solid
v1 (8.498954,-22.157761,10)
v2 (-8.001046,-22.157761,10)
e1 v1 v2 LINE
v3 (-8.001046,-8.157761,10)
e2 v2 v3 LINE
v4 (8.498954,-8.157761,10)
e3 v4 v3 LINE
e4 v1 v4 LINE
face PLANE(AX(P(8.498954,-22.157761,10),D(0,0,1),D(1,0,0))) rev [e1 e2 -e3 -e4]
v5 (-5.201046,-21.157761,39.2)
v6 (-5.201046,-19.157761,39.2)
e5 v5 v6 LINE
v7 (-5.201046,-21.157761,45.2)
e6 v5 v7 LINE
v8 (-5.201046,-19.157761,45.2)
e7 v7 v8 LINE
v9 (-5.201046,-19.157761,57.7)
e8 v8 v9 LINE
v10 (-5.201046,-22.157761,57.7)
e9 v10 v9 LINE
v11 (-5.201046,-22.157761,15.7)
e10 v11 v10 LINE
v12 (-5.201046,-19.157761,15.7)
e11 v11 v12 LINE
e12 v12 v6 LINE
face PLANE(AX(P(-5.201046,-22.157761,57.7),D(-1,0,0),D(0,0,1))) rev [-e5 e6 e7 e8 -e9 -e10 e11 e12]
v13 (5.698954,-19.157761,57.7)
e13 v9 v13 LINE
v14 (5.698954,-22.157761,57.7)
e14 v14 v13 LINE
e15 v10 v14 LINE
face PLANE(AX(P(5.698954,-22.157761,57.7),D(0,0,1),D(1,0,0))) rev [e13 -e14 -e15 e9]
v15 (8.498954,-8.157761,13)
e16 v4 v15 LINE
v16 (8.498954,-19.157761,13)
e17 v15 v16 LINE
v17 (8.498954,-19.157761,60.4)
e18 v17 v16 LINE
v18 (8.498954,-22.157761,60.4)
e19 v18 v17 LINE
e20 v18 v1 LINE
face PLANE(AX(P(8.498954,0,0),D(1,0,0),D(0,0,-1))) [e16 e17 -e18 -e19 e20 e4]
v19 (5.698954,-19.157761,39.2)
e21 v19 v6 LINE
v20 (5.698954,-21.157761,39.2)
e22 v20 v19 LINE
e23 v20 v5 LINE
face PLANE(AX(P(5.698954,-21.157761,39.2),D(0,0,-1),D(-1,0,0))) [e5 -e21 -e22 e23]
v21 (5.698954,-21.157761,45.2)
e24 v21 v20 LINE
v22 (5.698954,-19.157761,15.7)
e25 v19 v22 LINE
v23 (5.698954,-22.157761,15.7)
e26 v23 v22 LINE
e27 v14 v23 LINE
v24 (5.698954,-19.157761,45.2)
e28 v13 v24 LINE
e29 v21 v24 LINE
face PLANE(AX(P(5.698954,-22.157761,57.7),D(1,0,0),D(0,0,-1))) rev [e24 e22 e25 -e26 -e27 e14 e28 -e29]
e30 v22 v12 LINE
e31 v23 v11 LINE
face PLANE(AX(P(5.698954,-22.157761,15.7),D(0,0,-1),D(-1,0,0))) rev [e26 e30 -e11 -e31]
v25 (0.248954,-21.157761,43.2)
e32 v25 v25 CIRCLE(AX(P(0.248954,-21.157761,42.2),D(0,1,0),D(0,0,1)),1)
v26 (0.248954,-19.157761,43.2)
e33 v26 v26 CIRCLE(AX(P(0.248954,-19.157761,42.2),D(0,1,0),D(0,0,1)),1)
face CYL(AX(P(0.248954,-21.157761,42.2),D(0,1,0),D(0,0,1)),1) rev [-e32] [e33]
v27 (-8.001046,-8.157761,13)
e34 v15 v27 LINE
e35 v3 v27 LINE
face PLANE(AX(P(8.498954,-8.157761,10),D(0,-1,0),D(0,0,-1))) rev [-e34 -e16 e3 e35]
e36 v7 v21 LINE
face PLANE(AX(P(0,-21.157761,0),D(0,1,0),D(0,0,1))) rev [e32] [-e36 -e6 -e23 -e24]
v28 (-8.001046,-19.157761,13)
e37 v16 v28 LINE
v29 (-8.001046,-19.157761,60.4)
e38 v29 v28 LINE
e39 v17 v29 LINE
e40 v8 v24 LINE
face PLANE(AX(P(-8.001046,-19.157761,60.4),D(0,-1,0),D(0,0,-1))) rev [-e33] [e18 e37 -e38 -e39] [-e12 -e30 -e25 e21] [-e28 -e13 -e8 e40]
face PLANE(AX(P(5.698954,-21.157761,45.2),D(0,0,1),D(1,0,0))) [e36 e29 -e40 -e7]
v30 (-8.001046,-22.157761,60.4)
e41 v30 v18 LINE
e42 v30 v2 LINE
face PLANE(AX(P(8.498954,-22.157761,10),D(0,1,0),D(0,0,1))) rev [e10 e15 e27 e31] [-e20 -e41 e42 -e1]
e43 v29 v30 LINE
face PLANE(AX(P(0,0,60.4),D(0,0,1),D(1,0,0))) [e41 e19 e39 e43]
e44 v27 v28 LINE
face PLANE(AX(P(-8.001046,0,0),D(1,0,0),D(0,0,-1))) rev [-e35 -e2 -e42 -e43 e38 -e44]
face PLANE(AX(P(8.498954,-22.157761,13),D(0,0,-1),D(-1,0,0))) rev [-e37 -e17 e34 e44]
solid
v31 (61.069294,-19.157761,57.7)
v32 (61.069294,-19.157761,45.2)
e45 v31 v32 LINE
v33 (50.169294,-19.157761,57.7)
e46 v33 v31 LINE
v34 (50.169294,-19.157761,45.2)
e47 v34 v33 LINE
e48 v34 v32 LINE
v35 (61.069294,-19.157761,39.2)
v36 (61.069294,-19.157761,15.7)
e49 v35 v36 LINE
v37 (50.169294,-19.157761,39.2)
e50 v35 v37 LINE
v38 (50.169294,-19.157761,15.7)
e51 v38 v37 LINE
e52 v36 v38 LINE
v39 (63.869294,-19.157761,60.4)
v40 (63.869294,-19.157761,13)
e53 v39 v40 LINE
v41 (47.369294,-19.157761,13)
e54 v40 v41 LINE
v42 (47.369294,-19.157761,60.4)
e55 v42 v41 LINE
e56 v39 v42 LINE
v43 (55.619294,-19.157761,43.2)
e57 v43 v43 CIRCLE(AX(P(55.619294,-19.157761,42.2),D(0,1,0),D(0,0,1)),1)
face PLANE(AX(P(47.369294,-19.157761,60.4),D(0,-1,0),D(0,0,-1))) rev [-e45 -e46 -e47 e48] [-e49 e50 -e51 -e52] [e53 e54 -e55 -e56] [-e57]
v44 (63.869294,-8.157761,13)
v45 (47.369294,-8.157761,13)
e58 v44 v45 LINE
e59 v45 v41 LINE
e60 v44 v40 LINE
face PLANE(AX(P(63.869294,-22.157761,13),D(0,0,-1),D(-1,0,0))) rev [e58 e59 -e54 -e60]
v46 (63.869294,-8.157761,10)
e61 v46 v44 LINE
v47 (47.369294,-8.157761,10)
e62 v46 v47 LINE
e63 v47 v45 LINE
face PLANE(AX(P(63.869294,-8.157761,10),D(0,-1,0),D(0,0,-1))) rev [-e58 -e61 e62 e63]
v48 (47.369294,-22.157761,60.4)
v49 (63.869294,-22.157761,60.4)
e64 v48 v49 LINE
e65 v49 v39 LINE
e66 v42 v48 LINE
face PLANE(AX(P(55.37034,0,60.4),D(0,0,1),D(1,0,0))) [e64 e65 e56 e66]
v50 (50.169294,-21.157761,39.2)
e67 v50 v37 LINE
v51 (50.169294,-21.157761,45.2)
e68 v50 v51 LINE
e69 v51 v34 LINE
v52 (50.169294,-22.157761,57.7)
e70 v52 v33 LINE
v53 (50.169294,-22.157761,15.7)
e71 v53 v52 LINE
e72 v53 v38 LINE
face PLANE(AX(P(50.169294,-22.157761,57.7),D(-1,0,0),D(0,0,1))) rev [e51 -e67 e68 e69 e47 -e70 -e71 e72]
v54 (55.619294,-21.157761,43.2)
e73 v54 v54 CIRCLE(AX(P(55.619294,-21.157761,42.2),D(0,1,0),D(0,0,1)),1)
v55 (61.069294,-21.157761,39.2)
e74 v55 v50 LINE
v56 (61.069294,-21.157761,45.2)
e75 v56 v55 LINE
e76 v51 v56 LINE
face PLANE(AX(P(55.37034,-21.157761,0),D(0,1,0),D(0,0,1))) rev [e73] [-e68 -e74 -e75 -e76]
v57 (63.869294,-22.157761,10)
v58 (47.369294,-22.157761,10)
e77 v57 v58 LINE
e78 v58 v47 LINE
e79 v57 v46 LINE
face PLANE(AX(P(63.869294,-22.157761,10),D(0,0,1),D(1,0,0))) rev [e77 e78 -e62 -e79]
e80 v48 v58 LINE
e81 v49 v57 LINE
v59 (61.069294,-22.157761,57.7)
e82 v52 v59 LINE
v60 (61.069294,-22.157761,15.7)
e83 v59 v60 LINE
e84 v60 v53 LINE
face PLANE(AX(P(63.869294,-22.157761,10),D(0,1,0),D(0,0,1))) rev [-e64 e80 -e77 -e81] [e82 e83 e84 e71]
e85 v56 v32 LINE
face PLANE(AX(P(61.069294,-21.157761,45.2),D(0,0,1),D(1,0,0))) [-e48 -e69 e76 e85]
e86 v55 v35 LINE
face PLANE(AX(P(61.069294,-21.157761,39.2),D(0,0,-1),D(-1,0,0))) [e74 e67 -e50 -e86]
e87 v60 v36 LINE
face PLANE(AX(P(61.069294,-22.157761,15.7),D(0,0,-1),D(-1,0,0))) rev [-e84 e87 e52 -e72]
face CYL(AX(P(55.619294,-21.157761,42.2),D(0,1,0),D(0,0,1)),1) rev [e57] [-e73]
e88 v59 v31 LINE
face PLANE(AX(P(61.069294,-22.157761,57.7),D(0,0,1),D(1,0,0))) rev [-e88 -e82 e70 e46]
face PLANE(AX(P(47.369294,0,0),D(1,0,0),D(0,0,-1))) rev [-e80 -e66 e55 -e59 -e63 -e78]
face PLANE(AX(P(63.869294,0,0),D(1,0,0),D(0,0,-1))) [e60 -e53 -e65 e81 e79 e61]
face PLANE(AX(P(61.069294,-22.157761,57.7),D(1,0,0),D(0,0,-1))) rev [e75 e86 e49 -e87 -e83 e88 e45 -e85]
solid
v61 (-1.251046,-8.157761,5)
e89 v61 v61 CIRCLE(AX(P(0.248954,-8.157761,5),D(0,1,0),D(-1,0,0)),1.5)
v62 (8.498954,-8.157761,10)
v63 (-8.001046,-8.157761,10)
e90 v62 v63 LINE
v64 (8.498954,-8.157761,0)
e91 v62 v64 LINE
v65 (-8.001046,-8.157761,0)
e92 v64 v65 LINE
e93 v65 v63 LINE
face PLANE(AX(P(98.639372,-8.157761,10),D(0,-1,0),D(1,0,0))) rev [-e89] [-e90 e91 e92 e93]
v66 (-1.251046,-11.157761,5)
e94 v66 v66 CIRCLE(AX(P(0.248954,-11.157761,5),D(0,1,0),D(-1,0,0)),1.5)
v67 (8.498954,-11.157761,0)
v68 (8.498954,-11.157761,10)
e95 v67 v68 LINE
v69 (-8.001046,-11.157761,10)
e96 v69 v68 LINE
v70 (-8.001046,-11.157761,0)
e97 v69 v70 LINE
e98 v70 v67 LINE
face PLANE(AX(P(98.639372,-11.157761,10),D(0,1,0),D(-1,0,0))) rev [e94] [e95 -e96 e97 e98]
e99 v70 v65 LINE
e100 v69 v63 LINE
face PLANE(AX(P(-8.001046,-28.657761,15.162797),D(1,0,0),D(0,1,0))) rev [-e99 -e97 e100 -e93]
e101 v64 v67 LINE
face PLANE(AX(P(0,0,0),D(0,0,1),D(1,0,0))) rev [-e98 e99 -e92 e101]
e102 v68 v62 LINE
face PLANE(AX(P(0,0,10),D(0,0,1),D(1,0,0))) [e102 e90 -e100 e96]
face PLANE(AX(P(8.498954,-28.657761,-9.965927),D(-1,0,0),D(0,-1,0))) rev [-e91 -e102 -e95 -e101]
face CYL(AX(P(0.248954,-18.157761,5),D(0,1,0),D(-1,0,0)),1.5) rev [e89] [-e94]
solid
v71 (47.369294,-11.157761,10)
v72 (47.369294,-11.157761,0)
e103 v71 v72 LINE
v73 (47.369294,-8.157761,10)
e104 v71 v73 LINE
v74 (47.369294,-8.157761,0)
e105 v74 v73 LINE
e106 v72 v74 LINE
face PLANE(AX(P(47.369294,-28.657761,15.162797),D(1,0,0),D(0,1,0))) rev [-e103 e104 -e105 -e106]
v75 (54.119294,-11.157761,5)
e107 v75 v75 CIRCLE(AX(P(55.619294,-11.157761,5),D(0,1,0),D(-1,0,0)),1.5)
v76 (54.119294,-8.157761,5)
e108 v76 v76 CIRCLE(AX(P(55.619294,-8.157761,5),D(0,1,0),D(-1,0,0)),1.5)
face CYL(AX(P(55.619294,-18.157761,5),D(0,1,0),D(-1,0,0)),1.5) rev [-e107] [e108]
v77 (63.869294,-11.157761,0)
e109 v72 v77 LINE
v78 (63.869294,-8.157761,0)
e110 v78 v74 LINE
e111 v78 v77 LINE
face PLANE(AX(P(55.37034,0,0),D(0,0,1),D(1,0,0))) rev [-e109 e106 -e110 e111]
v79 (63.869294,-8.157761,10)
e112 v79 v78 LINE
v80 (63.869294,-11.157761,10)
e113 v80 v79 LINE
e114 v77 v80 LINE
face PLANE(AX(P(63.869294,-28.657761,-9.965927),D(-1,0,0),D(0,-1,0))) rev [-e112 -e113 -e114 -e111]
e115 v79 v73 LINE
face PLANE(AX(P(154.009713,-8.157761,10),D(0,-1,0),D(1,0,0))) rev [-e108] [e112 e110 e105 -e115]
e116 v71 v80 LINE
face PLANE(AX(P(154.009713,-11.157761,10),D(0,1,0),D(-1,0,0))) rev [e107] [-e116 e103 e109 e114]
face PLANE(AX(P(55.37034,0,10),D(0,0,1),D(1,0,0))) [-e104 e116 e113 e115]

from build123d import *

# Parameters (mm, degrees)
SKETCH1_W                   = 170
SKETCH1_H                   = 3
BOSS_EXTRUDE1_DEPTH         = 10
SKETCH4_R                   = 1.2
CUT_EXTRUDE1_DEPTH          = 21
SKETCH2_W                   = 45.3
SKETCH2_H                   = 3
BOSS_EXTRUDE6_DEPTH         = 20.3
SKETCH5_R                   = 8.5
CUT_EXTRUDE2_DEPTH          = 20.3
SKETCH6_W                   = 45.3
SKETCH6_H                   = 3
BOSS_EXTRUDE7_DEPTH         = 20.3
SKETCH7_R                   = 8.5
CUT_EXTRUDE3_DEPTH          = 100.885733504
SKETCH11_W                  = 3
SKETCH11_H                  = 14
BOSS_EXTRUDE10_DEPTH        = 16.5
SKETCH12_W                  = 16.5
SKETCH12_H                  = 3
BOSS_EXTRUDE11_DEPTH        = 47.4
SKETCH13_W                  = 10.9
SKETCH13_H                  = 42
CUT_EXTRUDE5_DEPTH          = 120.823102106
SKETCH14_W                  = 23
SKETCH14_H                  = 3
BOSS_EXTRUDE12_DEPTH        = 9.5
SKETCH15_W                  = 17
SKETCH15_H                  = 3.5
CUT_EXTRUDE6_DEPTH          = 9.5
CUT_EXTRUDE7_DEPTH          = 124.643656623
CUT_EXTRUDE7_DEPTH_BACK     = 124.643656623
SKETCH16_W                  = 63.359581381
SKETCH16_H                  = 20.22579087
SKETCH16_W_2                = 63.3
SKETCH16_H_2                = 23.873064633
CUT_EXTRUDE9_DEPTH          = 85.468149706
CUT_EXTRUDE9_DEPTH_BACK     = 85.468149706
SKETCH17_W                  = 10.34603958
SKETCH17_H                  = 19.965926612
SKETCH18_R                  = 1.5
CUT_EXTRUDE10_DEPTH         = 10
SKETCH22_W                  = 30.660472615
SKETCH22_H                  = 85.471317495
CUT_EXTRUDE14_DEPTH         = 85.468149706
SKETCH23_W                  = 30.27196453
SKETCH23_H                  = 7.283480188
CUT_EXTRUDE15_DEPTH         = 74.568083116
SKETCH24_W                  = 10.9
SKETCH24_H                  = 6
SKETCH24_R                  = 1
BOSS_EXTRUDE13_DEPTH        = 2
BODY_MOVE_COPY5_START       = -22.157761352
BODY_MOVE_COPY5_OUTLINE_W   = 16.5
BODY_MOVE_COPY5_OUTLINE_H   = 50.4
BODY_MOVE_COPY5_OUTLINE_W_2 = 10.9
BODY_MOVE_COPY5_OUTLINE_H_2 = 42
BODY_MOVE_COPY5_DEPTH       = 3
BODY_MOVE_COPY5_START_2     = -19.157761352
BODY_MOVE_COPY5_2_OUTLINE_W = 16.5
BODY_MOVE_COPY5_2_OUTLINE_H = 3
BODY_MOVE_COPY5_2_DEPTH     = 11
BODY_MOVE_COPY5_START_3     = -21.157761352
BODY_MOVE_COPY5_3_OUTLINE_W = 10.9
BODY_MOVE_COPY5_3_OUTLINE_H = 6
BODY_MOVE_COPY5_3_OUTLINE_R = 1
BODY_MOVE_COPY5_3_DEPTH     = 2
BODY_MOVE_COPY5_START_4     = -11.157761352
BODY_MOVE_COPY5_4_OUTLINE_W = 16.5
BODY_MOVE_COPY5_4_OUTLINE_H = 10
BODY_MOVE_COPY5_4_OUTLINE_R = 1.5
BODY_MOVE_COPY5_4_DEPTH     = 3


# Read off the part's stored shape, not the designer's step: Body-Move/Copy5
with BuildPart() as part:
    # Sketch1 → Boss-Extrude1 (new body)
    with BuildSketch(Plane.XY):
        with Locations((13.639372454, -9.657761352)):
            Rectangle(SKETCH1_W, SKETCH1_H)
    extrude(amount=BOSS_EXTRUDE1_DEPTH)

    # Sketch4 → Cut-Extrude1 (cut)
    with BuildSketch(Plane(origin=(0, -8.157761352, 0), x_dir=(1, 0, 0), z_dir=(0, 1, 0))):
        with Locations(Location((-63.360627546, -4.938536908, 0), (0, 0, 180))):
            Circle(SKETCH4_R)
        with Locations(Location((90.639372454, -5.283238547, 0), (0, 0, 180))):
            Circle(SKETCH4_R)
    extrude(amount=-CUT_EXTRUDE1_DEPTH, mode=Mode.SUBTRACT)

    # Sketch2 → Boss-Extrude6 (add)
    with BuildSketch(Plane(origin=(0, -8.157761352, 0), x_dir=(1, 0, 0), z_dir=(0, 1, 0))):
        with Locations((-30.710627546, -8.5)):
            Rectangle(SKETCH2_W, SKETCH2_H)
    extrude(amount=BOSS_EXTRUDE6_DEPTH)

    # Sketch5 → Cut-Extrude2 (cut)
    with BuildSketch(Plane(origin=(0, 0, 7), x_dir=(-1, 0, 0), z_dir=(0, 0, -1))):
        with Locations((17.460627546, 1.942238648)):
            Circle(SKETCH5_R)
        with Locations((43.960627546, 1.942238648)):
            Circle(SKETCH5_R)
        with BuildLine():
            Line((27.510627546, -3.557761352), (33.910627546, -3.557761352))
            ThreePointArc((33.910627546, -3.557761352), (35.810627546, -5.457761352), (33.910627546, -7.357761352))
            Line((33.910627546, -7.357761352), (27.510627546, -7.357761352))
            ThreePointArc((27.510627546, -7.357761352), (25.610627546, -5.457761352), (27.510627546, -3.557761352))
        make_face()
    extrude(amount=-CUT_EXTRUDE2_DEPTH, mode=Mode.SUBTRACT)

    # Sketch6 → Boss-Extrude7 (add)
    with BuildSketch(Plane(origin=(0, -8.157761352, 0), x_dir=(1, 0, 0), z_dir=(0, 1, 0))):
        with Locations((57.989372454, -8.5)):
            Rectangle(SKETCH6_W, SKETCH6_H)
    extrude(amount=BOSS_EXTRUDE7_DEPTH)

    # Sketch7 → Cut-Extrude3 (cut, through all)
    with BuildSketch(Plane.XY.offset(10)):
        with Locations((44.739372454, 1.942238648)):
            Circle(SKETCH7_R)
        with Locations((71.239372454, 1.942238648)):
            Circle(SKETCH7_R)
        with BuildLine():
            Line((54.839372454, -3.557761352), (61.239372454, -3.557761352))
            ThreePointArc((61.239372454, -3.557761352), (63.139372454, -5.457761352), (61.239372454, -7.357761352))
            Line((61.239372454, -7.357761352), (54.839372454, -7.357761352))
            ThreePointArc((54.839372454, -7.357761352), (52.939372454, -5.457761352), (54.839372454, -3.557761352))
        make_face()
    extrude(amount=-CUT_EXTRUDE3_DEPTH, mode=Mode.SUBTRACT)


with BuildPart() as body_2:
    # Sketch11 → Boss-Extrude10 (new body)
    with BuildSketch(Plane(origin=(98.639372454, 0, 0), x_dir=(0, 0, -1), z_dir=(1, 0, 0))):
        with Locations((-11.5, -15.157761352)):
            Rectangle(SKETCH11_W, SKETCH11_H)
    extrude(amount=BOSS_EXTRUDE10_DEPTH)


with BuildPart() as body_2_1:
    # Body-Move/Copy1: moved
    add(body_2.part.moved(Location((-106.640418619, 0, 0))))

    # Sketch12 → Boss-Extrude11 (add)
    with BuildSketch(Plane.XY.offset(13)):
        with Locations((0.248953835, -20.657761352)):
            Rectangle(SKETCH12_W, SKETCH12_H)
    extrude(amount=BOSS_EXTRUDE11_DEPTH)

    # Sketch13 → Cut-Extrude5 (cut, through all)
    with BuildSketch(Plane(origin=(0, -19.157761352, 0), x_dir=(1, 0, 0), z_dir=(0, 1, 0))):
        with Locations((0.248953835, -36.7)):
            Rectangle(SKETCH13_W, SKETCH13_H)
    extrude(amount=-CUT_EXTRUDE5_DEPTH, mode=Mode.SUBTRACT)


with BuildPart() as body_3:
    # Body-Move/Copy3: copy of body 2
    add(body_2_1.part.moved(Location((26.84603958, 0, 0))))


with BuildPart() as body_4:
    # Sketch14 → Boss-Extrude12 (new body)
    with BuildSketch(Plane(origin=(0, -19.157761352, 0), x_dir=(1, 0, 0), z_dir=(0, 1, 0))):
        with Locations((-0.888899403, -70.178295355)):
            Rectangle(SKETCH14_W, SKETCH14_H)
    extrude(amount=-BOSS_EXTRUDE12_DEPTH)

    # Sketch15 → Cut-Extrude6 (cut)
    with BuildSketch(Plane.XY.offset(71.678295355)):
        with Locations((-0.888899403, -23.907761352)):
            Rectangle(SKETCH15_W, SKETCH15_H)
    extrude(amount=-CUT_EXTRUDE6_DEPTH, mode=Mode.SUBTRACT)


with BuildPart() as body_5:
    # Body-Move/Copy4: copy of body 4
    add(body_4.part.moved(Location((29.098347772, 0, 0))))


with BuildPart() as cut_extrude7_tool:
    # Sketch16 → Cut-Extrude7 (new, two sides: drawn at the far end of the back side and taken through both)
    with BuildSketch(Plane(origin=(0, -8.157761352, 0), x_dir=(1, 0, 0), z_dir=(0, 1, 0)).offset(-CUT_EXTRUDE7_DEPTH_BACK)):
        with Locations((-39.680836856, -5.049901743)):
            Rectangle(SKETCH16_W, SKETCH16_H)
        with Locations((66.989372454, -3.392050033)):
            Rectangle(SKETCH16_W_2, SKETCH16_H_2)
    extrude(amount=CUT_EXTRUDE7_DEPTH + CUT_EXTRUDE7_DEPTH_BACK)


with BuildPart() as part_1:
    add(part.part)

    # Cut-Extrude7: cut by cut_extrude7_tool
    add(cut_extrude7_tool.part, mode=Mode.SUBTRACT)

    # Sketch17 → Cut-Extrude9 (cut, two sides: drawn at the far end of the back side and taken through both)
    with BuildSketch(Plane(origin=(0, -8.157761352, 0), x_dir=(1, 0, 0), z_dir=(0, 1, 0)).offset(-CUT_EXTRUDE9_DEPTH_BACK)):
        with Locations((13.671973625, -0.017036694)):
            Rectangle(SKETCH17_W, SKETCH17_H)
    extrude(amount=CUT_EXTRUDE9_DEPTH + CUT_EXTRUDE9_DEPTH_BACK, mode=Mode.SUBTRACT)


with BuildPart() as body_3_1:
    add(body_3.part)

    # Cut-Extrude7: cut by cut_extrude7_tool
    add(cut_extrude7_tool.part, mode=Mode.SUBTRACT)


with BuildPart() as cut_extrude9_piece_1:
    # of the separate pieces the step leaves, piece 1, a body of its own (cut_extrude9_pieces)
    add(part_1.part.solids().sort_by_distance((8.498953835, -11.157761352, 0))[0])


with BuildPart() as cut_extrude9_piece_2:
    # of the separate pieces the step leaves, piece 2, a body of its own (cut_extrude9_pieces)
    add(part_1.part.solids().sort_by_distance((35.339372454, -11.157761352, 0))[0])


with BuildPart() as cut_extrude10_tool:
    # Sketch18 → Cut-Extrude10 (new body)
    with BuildSketch(Plane(origin=(0, -8.157761352, 0), x_dir=(1, 0, 0), z_dir=(0, 1, 0))):
        with Locations(Location((0.248953835, -5, 0), (0, 0, 180))):
            Circle(SKETCH18_R)
        with Locations(Location((27.094993415, -5, 0), (0, 0, 180))):
            Circle(SKETCH18_R)
    extrude(amount=-CUT_EXTRUDE10_DEPTH)


with BuildPart() as cut_extrude9_piece_1_1:
    add(cut_extrude9_piece_1.part)

    # Cut-Extrude10: cut by cut_extrude10_tool
    add(cut_extrude10_tool.part, mode=Mode.SUBTRACT)


with BuildPart() as cut_extrude9_piece_2_1:
    add(cut_extrude9_piece_2.part)

    # Cut-Extrude10: cut by cut_extrude10_tool
    add(cut_extrude10_tool.part, mode=Mode.SUBTRACT)


with BuildPart() as cut_extrude14_tool:
    # Sketch22 → Cut-Extrude14 (new, through all)
    with BuildSketch(Plane(origin=(0, -8.157761352, 0), x_dir=(1, 0, 0), z_dir=(0, 1, 0))):
        with Locations((30.670536688, -31.705614743)):
            Rectangle(SKETCH22_W, SKETCH22_H)
    extrude(amount=-CUT_EXTRUDE14_DEPTH)


with BuildPart() as body_3_2:
    add(body_3_1.part)

    # Cut-Extrude14: cut by cut_extrude14_tool
    add(cut_extrude14_tool.part, mode=Mode.SUBTRACT)


with BuildPart() as body_5_1:
    add(body_5.part)

    # Cut-Extrude14: cut by cut_extrude14_tool
    add(cut_extrude14_tool.part, mode=Mode.SUBTRACT)


with BuildPart() as cut_extrude9_piece_2_2:
    add(cut_extrude9_piece_2_1.part)

    # Cut-Extrude14: cut by cut_extrude14_tool
    add(cut_extrude14_tool.part, mode=Mode.SUBTRACT)


with BuildPart() as body_4_1:
    add(body_4.part)

    # Sketch23 → Cut-Extrude15 (cut, through all)
    with BuildSketch(Plane(origin=(0, -19.157761352, 0), x_dir=(1, 0, 0), z_dir=(0, 1, 0))):
        with Locations((-0.513403302, -70.531997743)):
            Rectangle(SKETCH23_W, SKETCH23_H)
    extrude(amount=-CUT_EXTRUDE15_DEPTH, mode=Mode.SUBTRACT)


with BuildPart() as body_2_2:
    add(body_2_1.part)

    # Sketch24 → Boss-Extrude13 (add)
    with BuildSketch(Plane(origin=(0, -19.157761352, 0), x_dir=(1, 0, 0), z_dir=(0, 1, 0))):
        with Locations((0.248953835, -42.2)):
            Rectangle(SKETCH24_W, SKETCH24_H)
        with Locations(Location((0.248953835, -42.2, 0), (0, 0, 270))):
            Circle(SKETCH24_R, mode=Mode.SUBTRACT)
    extrude(amount=-BOSS_EXTRUDE13_DEPTH)


with BuildPart() as body_3_2_1:
    # Body-Move/Copy5 outline → Body-Move/Copy5 (new body)
    with BuildSketch(Plane(origin=(0, 0, 0), x_dir=(1, 0, 0), z_dir=(0, 1, 0)).offset(BODY_MOVE_COPY5_START)):
        with Locations((55.61929397, -35.2)):
            Rectangle(BODY_MOVE_COPY5_OUTLINE_W, BODY_MOVE_COPY5_OUTLINE_H)
        with Locations((55.61929397, -36.7)):
            Rectangle(BODY_MOVE_COPY5_OUTLINE_W_2, BODY_MOVE_COPY5_OUTLINE_H_2, mode=Mode.SUBTRACT)
    extrude(amount=BODY_MOVE_COPY5_DEPTH)

    # Body-Move_Copy5 2 outline → Body-Move_Copy5 2 (add)
    with BuildSketch(Plane(origin=(0, 0, 0), x_dir=(1, 0, 0), z_dir=(0, 1, 0)).offset(BODY_MOVE_COPY5_START_2)):
        with Locations((55.61929397, -11.5)):
            Rectangle(BODY_MOVE_COPY5_2_OUTLINE_W, BODY_MOVE_COPY5_2_OUTLINE_H)
    extrude(amount=BODY_MOVE_COPY5_2_DEPTH)

    # Body-Move_Copy5 3 outline → Body-Move_Copy5 3 (add)
    with BuildSketch(Plane(origin=(0, 0, 0), x_dir=(1, 0, 0), z_dir=(0, 1, 0)).offset(BODY_MOVE_COPY5_START_3)):
        with Locations((55.61929397, -42.2)):
            Rectangle(BODY_MOVE_COPY5_3_OUTLINE_W, BODY_MOVE_COPY5_3_OUTLINE_H)
        with Locations((55.61929397, -42.2)):
            Circle(BODY_MOVE_COPY5_3_OUTLINE_R, mode=Mode.SUBTRACT)
    extrude(amount=BODY_MOVE_COPY5_3_DEPTH)


with BuildPart() as body_4_2:
    # Body-Move_Copy5 4 outline → Body-Move_Copy5 4 (new body)
    with BuildSketch(Plane(origin=(0, 0, 0), x_dir=(1, 0, 0), z_dir=(0, 1, 0)).offset(BODY_MOVE_COPY5_START_4)):
        with Locations((55.61929397, -5)):
            Rectangle(BODY_MOVE_COPY5_4_OUTLINE_W, BODY_MOVE_COPY5_4_OUTLINE_H)
        with Locations((55.61929397, -5)):
            Circle(BODY_MOVE_COPY5_4_OUTLINE_R, mode=Mode.SUBTRACT)
    extrude(amount=BODY_MOVE_COPY5_4_DEPTH)


solid = Compound([cut_extrude9_piece_1_1.part, body_2_2.part, body_3_2_1.part, body_4_2.part])
